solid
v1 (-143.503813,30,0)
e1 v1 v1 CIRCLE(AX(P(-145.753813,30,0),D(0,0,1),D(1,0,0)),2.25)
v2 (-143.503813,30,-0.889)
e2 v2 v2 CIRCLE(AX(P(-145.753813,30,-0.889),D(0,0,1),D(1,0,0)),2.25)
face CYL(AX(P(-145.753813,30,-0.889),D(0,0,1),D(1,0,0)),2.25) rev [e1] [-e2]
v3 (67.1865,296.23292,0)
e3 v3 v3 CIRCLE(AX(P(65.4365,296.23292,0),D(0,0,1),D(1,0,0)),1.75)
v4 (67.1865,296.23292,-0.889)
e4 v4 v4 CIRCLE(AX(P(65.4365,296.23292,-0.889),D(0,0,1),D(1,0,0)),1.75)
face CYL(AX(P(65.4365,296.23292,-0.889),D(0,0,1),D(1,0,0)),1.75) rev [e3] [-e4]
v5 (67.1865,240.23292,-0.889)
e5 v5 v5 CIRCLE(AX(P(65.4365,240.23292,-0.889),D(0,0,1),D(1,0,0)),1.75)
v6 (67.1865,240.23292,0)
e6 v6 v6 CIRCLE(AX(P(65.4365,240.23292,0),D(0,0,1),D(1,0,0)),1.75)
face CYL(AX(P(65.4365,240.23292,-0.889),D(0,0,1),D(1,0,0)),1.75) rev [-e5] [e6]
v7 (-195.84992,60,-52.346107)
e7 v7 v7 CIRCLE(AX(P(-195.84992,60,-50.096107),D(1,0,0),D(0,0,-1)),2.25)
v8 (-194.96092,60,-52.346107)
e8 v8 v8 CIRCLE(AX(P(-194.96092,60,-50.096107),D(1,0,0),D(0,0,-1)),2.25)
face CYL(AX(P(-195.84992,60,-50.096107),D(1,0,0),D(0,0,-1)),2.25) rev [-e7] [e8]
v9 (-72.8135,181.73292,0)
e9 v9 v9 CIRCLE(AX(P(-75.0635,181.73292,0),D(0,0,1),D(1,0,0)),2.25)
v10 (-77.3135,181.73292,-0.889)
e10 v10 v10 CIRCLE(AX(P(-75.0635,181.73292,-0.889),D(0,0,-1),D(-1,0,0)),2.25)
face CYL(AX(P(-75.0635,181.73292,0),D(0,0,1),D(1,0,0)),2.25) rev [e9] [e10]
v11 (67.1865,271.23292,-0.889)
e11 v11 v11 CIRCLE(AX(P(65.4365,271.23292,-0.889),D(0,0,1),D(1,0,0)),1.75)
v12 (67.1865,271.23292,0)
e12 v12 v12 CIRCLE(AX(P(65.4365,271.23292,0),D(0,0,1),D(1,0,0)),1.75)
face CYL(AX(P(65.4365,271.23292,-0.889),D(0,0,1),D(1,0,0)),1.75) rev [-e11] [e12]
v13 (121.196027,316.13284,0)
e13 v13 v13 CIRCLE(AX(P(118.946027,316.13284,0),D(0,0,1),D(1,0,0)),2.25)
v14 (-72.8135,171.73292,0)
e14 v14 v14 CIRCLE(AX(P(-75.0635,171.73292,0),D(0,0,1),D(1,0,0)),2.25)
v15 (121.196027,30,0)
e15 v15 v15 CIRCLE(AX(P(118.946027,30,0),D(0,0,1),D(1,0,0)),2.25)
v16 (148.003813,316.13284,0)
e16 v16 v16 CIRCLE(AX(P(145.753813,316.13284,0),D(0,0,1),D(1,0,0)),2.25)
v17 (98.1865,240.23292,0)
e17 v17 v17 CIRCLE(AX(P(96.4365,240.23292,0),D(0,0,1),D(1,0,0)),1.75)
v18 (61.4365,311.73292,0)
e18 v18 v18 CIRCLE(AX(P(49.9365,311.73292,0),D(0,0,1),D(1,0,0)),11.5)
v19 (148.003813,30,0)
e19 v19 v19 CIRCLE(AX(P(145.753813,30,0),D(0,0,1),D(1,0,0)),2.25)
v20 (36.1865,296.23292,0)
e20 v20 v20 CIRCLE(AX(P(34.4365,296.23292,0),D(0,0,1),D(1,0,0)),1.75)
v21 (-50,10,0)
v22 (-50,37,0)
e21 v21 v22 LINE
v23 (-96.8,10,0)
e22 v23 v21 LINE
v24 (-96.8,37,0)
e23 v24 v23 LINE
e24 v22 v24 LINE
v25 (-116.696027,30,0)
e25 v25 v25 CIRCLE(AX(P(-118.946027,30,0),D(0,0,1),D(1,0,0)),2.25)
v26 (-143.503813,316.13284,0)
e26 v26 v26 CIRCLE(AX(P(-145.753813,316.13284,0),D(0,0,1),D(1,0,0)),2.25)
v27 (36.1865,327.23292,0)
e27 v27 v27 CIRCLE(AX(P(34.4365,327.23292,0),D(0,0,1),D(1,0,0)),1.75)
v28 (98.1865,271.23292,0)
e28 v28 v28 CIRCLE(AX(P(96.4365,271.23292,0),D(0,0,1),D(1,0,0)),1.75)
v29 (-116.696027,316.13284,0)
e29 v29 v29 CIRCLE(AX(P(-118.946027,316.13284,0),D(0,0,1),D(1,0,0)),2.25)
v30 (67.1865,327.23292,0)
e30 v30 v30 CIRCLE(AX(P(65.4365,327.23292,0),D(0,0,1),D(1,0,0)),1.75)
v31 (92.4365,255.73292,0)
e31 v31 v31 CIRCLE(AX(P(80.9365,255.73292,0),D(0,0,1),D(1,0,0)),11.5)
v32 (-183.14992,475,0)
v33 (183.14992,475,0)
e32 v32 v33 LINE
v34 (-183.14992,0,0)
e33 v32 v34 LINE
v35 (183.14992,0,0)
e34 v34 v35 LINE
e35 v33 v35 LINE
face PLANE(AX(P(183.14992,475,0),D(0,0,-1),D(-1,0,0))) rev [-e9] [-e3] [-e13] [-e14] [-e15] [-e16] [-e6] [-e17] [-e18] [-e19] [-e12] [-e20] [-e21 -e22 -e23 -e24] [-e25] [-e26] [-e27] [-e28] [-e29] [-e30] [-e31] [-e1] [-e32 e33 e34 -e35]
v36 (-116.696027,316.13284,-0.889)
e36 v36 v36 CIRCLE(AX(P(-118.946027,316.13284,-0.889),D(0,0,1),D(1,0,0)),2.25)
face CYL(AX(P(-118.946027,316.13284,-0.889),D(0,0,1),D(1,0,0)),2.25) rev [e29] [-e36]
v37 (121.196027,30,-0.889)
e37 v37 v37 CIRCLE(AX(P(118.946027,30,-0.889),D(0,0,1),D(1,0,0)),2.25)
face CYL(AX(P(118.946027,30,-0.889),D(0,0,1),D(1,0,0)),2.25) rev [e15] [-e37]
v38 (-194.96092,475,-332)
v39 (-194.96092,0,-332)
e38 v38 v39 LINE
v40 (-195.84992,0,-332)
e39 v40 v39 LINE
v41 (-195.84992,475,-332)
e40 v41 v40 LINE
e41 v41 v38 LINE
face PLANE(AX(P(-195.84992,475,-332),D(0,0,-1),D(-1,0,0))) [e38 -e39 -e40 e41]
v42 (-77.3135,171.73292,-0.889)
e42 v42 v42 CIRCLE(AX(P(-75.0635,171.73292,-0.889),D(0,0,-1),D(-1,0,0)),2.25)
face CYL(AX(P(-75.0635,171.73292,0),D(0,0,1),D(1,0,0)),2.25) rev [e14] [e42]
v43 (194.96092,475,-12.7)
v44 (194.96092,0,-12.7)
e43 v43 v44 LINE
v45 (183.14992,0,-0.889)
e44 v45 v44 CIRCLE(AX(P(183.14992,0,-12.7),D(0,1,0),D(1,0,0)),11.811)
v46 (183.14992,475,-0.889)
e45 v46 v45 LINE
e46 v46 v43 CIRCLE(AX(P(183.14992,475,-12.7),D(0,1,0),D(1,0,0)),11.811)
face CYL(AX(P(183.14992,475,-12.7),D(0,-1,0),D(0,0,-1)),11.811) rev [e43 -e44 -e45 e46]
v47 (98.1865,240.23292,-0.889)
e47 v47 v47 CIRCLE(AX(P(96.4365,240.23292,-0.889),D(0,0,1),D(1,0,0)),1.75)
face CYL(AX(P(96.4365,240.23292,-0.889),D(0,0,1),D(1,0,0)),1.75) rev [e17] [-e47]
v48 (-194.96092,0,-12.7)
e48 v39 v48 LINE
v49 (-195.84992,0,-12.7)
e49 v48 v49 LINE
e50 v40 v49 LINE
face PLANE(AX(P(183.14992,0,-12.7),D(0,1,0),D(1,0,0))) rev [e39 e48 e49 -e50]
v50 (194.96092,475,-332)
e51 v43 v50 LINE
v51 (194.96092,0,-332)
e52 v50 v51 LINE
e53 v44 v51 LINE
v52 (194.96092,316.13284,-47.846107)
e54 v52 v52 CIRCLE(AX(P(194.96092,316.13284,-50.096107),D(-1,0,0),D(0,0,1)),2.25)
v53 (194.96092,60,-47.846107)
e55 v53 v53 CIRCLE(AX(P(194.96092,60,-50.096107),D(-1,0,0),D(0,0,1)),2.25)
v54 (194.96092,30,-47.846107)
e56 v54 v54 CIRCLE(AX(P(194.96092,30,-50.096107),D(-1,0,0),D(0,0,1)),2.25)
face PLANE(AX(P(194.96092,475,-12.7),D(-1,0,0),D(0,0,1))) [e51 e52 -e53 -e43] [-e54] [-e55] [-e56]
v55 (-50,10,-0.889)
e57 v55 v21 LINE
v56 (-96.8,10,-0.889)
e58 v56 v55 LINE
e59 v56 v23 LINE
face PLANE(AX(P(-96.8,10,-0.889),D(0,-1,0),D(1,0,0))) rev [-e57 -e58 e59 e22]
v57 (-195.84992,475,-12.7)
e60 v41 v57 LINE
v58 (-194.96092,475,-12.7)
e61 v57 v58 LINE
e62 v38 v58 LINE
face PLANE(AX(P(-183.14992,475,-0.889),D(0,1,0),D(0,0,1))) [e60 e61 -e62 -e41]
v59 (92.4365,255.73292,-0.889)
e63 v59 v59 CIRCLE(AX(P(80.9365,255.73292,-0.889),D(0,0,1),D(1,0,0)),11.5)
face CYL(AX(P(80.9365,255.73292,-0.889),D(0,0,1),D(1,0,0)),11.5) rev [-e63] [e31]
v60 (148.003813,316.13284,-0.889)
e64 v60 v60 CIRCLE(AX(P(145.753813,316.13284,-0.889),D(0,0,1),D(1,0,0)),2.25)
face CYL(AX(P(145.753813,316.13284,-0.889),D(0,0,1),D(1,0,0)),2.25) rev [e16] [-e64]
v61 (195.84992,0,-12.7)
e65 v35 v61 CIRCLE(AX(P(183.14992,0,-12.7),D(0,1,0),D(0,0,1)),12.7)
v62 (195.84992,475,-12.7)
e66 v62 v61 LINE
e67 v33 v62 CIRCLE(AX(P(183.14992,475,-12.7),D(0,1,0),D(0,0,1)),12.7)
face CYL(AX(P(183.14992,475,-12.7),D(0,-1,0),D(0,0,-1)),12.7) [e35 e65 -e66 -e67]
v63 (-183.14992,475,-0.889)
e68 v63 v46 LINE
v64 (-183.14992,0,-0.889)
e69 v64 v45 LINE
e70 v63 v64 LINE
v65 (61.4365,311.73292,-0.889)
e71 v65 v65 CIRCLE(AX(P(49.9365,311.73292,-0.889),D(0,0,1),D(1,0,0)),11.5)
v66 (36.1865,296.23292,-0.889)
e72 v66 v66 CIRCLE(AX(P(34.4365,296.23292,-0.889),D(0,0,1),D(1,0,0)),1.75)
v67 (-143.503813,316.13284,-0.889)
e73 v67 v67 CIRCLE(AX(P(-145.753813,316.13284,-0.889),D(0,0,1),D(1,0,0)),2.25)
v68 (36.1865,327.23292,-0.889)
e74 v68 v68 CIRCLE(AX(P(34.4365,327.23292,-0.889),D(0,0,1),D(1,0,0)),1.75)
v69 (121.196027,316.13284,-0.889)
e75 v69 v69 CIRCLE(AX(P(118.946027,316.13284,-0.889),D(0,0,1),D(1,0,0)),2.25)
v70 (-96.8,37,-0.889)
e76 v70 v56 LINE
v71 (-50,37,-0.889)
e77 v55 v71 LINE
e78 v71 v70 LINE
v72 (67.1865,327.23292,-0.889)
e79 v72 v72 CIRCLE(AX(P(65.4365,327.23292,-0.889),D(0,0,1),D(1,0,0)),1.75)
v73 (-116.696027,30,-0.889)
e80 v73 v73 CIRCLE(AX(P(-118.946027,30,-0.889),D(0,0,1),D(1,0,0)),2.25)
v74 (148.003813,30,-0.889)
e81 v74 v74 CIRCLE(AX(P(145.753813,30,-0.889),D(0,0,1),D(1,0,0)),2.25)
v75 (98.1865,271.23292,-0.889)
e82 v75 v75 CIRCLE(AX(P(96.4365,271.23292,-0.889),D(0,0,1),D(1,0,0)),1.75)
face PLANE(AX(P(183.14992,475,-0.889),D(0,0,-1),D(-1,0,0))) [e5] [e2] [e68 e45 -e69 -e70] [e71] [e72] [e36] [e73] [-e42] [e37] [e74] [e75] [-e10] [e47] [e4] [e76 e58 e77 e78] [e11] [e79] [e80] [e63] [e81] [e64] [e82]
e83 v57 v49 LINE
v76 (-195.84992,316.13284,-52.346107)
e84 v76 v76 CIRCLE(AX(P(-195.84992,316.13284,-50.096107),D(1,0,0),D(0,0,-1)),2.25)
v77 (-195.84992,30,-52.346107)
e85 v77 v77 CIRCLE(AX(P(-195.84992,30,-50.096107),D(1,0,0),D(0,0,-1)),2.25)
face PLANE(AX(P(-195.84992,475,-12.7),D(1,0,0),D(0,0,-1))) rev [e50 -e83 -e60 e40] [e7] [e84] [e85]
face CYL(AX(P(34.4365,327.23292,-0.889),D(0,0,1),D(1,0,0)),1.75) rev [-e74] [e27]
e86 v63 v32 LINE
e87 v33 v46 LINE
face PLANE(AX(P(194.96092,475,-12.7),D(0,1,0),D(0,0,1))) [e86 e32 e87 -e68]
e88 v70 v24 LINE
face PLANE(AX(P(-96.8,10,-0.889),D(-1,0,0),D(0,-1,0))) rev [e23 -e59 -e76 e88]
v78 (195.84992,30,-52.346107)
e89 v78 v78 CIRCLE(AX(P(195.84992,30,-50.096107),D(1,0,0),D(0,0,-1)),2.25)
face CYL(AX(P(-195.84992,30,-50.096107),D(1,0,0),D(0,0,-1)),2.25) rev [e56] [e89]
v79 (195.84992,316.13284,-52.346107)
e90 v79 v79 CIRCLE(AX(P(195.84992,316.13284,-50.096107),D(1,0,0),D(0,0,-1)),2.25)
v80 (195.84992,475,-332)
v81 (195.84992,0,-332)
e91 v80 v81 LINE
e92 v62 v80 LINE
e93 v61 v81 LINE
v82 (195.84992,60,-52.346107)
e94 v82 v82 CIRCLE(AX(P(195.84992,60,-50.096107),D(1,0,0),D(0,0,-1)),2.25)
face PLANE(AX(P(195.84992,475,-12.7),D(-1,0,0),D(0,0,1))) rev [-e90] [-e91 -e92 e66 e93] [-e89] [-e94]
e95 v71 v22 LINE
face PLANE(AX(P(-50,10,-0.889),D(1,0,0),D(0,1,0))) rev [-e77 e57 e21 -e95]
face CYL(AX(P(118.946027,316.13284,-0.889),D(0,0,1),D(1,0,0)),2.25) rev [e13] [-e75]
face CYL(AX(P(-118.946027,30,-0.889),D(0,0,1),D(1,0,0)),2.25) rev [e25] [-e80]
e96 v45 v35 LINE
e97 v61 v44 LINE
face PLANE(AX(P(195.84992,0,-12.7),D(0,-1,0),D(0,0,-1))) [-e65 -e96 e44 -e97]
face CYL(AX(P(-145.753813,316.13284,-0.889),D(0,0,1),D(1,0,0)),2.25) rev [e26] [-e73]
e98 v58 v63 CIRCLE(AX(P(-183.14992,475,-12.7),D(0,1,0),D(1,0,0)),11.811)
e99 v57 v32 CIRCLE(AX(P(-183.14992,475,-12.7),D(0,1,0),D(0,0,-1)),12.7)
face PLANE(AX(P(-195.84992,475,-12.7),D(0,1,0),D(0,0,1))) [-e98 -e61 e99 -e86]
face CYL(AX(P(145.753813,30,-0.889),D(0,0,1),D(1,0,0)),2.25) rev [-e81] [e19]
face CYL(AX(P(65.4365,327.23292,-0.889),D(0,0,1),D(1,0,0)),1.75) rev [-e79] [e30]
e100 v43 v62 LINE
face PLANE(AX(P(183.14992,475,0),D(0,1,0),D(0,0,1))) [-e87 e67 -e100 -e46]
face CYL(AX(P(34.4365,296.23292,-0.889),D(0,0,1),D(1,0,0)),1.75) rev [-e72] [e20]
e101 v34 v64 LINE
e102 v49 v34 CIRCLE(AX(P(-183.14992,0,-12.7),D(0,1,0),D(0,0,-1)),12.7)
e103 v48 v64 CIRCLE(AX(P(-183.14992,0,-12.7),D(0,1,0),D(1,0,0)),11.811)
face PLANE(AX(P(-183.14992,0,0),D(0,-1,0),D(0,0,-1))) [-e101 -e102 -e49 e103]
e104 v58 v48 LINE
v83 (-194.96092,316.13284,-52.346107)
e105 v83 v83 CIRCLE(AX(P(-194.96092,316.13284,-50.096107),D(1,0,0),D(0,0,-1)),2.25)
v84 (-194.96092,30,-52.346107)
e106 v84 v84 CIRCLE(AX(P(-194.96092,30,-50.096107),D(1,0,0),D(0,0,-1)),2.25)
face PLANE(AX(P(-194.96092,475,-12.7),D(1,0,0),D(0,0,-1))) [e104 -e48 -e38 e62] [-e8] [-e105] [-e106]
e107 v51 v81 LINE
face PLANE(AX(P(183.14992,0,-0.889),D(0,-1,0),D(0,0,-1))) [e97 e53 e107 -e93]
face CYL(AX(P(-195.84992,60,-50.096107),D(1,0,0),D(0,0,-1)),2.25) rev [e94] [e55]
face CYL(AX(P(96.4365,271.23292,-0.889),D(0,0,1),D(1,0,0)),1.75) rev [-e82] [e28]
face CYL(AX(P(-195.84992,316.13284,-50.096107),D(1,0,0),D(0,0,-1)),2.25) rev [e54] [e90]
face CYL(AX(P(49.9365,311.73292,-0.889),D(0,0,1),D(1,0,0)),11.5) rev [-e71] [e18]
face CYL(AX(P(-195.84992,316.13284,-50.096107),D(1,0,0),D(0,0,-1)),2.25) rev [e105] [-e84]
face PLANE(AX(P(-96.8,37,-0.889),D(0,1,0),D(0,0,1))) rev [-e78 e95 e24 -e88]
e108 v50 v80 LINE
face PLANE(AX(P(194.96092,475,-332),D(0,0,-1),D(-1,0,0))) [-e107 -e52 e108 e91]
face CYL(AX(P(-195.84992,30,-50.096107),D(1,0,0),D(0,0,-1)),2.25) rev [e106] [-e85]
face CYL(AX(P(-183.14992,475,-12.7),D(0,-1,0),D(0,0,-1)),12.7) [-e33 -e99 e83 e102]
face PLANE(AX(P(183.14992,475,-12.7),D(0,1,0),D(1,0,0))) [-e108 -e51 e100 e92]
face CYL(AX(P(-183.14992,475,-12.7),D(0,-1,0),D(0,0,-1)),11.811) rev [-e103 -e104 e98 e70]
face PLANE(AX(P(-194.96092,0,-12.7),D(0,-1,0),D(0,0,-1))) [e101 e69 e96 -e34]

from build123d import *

# Parameters (mm, degrees)
BASE_FLANGE2_DEPTH         = 475
SKETCH13_R                 = 2.25
CUT_EXTRUDE4_DEPTH         = 700.483927325
SKETCH14_R                 = 11.5
SKETCH14_R_2               = 1.75
STEPPER_MOTOR_CUTOUT_DEPTH = 0.889
SKETCH15_R                 = 2.25
CUT_EXTRUDE6_DEPTH         = 0.889
SKETCH16_W                 = 46.8
SKETCH16_H                 = 27
CUT_EXTRUDE7_DEPTH         = 0.889
M4_CLEARANCE_HOLE1_D       = 4.5


# Sheet-metal steps are written as plain solids
with BuildPart() as part:
    # Sketch1 → Base-Flange2 (new body)
    with BuildSketch(Plane(origin=(0, 0, 0), x_dir=(1, 0, 0), z_dir=(0, 1, 0))):
        with BuildLine():
            Line((195.849919955, 332), (195.849919955, 12.7))
            ThreePointArc((195.849919955, 12.7), (192.130176076, 3.719743879), (183.149919955, 0))
            Line((183.149919955, 0), (-183.149919955, 0))
            ThreePointArc((-183.149919955, 0), (-192.130176076, 3.719743879), (-195.849919955, 12.7))
            Line((-195.849919955, 12.7), (-195.849919955, 332))
            Line((-195.849919955, 332), (-194.960919955, 332))
            Line((-194.960919955, 332), (-194.960919955, 12.7))
            ThreePointArc((-194.960919955, 12.7), (-191.501558148, 4.348361807), (-183.149919955, 0.889))
            Line((-183.149919955, 0.889), (183.149919955, 0.889))
            ThreePointArc((183.149919955, 0.889), (191.501558148, 4.348361807), (194.960919955, 12.7))
            Line((194.960919955, 12.7), (194.960919955, 332))
            Line((194.960919955, 332), (195.849919955, 332))
        make_face()
    extrude(amount=BASE_FLANGE2_DEPTH)

    # Sketch13 → Cut-Extrude4 (cut, through all)
    with BuildSketch(Plane(origin=(195.849919955, 0, 0), x_dir=(0, 0, -1), z_dir=(1, 0, 0))):
        with Locations((50.096107, 60)):
            Circle(SKETCH13_R)
        with Locations((50.096107, 316.132840032)):
            Circle(SKETCH13_R)
        with Locations((50.096107, 30)):
            Circle(SKETCH13_R)
    extrude(amount=-CUT_EXTRUDE4_DEPTH, mode=Mode.SUBTRACT)

    # Sketch14 → Stepper motor cutout (cut)
    with BuildSketch(Plane.XY):
        with Locations((49.936500045, 311.73292)):
            Circle(SKETCH14_R)
        with Locations((34.436500045, 296.23292)):
            Circle(SKETCH14_R_2)
        with Locations((65.436500045, 296.23292)):
            Circle(SKETCH14_R_2)
        with Locations((34.436500045, 327.23292)):
            Circle(SKETCH14_R_2)
        with Locations((65.436500045, 327.23292)):
            Circle(SKETCH14_R_2)
        with Locations((80.936500045, 255.73292)):
            Circle(SKETCH14_R)
        with Locations((65.436500045, 240.23292)):
            Circle(SKETCH14_R_2)
        with Locations((96.436500045, 240.23292)):
            Circle(SKETCH14_R_2)
        with Locations((65.436500045, 271.23292)):
            Circle(SKETCH14_R_2)
        with Locations((96.436500045, 271.23292)):
            Circle(SKETCH14_R_2)
    extrude(amount=-STEPPER_MOTOR_CUTOUT_DEPTH, mode=Mode.SUBTRACT)

    # Sketch15 → Cut-Extrude6 (cut)
    with BuildSketch(Plane.XY):
        with Locations((-145.753812955, 316.132839976)):
            Circle(SKETCH15_R)
        with Locations((-118.946026845, 316.132839976)):
            Circle(SKETCH15_R)
        with Locations((118.946026845, 316.132839976)):
            Circle(SKETCH15_R)
        with Locations((145.753812955, 316.132839976)):
            Circle(SKETCH15_R)
        with Locations((145.753812955, 30)):
            Circle(SKETCH15_R)
        with Locations((118.946026845, 30)):
            Circle(SKETCH15_R)
        with Locations((-118.946026845, 30)):
            Circle(SKETCH15_R)
        with Locations((-145.753812955, 30)):
            Circle(SKETCH15_R)
    extrude(amount=-CUT_EXTRUDE6_DEPTH, mode=Mode.SUBTRACT)

    # Sketch16 → Cut-Extrude7 (cut)
    with BuildSketch(Plane.XY):
        with Locations((-73.4, 23.5)):
            Rectangle(SKETCH16_W, SKETCH16_H)
    extrude(amount=-CUT_EXTRUDE7_DEPTH, mode=Mode.SUBTRACT)

    # M4 Clearance Hole1 (through all)
    with Locations(Plane.XY):
        with Locations((-75.063499955, 181.73292), (-75.063499955, 171.73292)):
            Hole(M4_CLEARANCE_HOLE1_D / 2)


solid = part.part
